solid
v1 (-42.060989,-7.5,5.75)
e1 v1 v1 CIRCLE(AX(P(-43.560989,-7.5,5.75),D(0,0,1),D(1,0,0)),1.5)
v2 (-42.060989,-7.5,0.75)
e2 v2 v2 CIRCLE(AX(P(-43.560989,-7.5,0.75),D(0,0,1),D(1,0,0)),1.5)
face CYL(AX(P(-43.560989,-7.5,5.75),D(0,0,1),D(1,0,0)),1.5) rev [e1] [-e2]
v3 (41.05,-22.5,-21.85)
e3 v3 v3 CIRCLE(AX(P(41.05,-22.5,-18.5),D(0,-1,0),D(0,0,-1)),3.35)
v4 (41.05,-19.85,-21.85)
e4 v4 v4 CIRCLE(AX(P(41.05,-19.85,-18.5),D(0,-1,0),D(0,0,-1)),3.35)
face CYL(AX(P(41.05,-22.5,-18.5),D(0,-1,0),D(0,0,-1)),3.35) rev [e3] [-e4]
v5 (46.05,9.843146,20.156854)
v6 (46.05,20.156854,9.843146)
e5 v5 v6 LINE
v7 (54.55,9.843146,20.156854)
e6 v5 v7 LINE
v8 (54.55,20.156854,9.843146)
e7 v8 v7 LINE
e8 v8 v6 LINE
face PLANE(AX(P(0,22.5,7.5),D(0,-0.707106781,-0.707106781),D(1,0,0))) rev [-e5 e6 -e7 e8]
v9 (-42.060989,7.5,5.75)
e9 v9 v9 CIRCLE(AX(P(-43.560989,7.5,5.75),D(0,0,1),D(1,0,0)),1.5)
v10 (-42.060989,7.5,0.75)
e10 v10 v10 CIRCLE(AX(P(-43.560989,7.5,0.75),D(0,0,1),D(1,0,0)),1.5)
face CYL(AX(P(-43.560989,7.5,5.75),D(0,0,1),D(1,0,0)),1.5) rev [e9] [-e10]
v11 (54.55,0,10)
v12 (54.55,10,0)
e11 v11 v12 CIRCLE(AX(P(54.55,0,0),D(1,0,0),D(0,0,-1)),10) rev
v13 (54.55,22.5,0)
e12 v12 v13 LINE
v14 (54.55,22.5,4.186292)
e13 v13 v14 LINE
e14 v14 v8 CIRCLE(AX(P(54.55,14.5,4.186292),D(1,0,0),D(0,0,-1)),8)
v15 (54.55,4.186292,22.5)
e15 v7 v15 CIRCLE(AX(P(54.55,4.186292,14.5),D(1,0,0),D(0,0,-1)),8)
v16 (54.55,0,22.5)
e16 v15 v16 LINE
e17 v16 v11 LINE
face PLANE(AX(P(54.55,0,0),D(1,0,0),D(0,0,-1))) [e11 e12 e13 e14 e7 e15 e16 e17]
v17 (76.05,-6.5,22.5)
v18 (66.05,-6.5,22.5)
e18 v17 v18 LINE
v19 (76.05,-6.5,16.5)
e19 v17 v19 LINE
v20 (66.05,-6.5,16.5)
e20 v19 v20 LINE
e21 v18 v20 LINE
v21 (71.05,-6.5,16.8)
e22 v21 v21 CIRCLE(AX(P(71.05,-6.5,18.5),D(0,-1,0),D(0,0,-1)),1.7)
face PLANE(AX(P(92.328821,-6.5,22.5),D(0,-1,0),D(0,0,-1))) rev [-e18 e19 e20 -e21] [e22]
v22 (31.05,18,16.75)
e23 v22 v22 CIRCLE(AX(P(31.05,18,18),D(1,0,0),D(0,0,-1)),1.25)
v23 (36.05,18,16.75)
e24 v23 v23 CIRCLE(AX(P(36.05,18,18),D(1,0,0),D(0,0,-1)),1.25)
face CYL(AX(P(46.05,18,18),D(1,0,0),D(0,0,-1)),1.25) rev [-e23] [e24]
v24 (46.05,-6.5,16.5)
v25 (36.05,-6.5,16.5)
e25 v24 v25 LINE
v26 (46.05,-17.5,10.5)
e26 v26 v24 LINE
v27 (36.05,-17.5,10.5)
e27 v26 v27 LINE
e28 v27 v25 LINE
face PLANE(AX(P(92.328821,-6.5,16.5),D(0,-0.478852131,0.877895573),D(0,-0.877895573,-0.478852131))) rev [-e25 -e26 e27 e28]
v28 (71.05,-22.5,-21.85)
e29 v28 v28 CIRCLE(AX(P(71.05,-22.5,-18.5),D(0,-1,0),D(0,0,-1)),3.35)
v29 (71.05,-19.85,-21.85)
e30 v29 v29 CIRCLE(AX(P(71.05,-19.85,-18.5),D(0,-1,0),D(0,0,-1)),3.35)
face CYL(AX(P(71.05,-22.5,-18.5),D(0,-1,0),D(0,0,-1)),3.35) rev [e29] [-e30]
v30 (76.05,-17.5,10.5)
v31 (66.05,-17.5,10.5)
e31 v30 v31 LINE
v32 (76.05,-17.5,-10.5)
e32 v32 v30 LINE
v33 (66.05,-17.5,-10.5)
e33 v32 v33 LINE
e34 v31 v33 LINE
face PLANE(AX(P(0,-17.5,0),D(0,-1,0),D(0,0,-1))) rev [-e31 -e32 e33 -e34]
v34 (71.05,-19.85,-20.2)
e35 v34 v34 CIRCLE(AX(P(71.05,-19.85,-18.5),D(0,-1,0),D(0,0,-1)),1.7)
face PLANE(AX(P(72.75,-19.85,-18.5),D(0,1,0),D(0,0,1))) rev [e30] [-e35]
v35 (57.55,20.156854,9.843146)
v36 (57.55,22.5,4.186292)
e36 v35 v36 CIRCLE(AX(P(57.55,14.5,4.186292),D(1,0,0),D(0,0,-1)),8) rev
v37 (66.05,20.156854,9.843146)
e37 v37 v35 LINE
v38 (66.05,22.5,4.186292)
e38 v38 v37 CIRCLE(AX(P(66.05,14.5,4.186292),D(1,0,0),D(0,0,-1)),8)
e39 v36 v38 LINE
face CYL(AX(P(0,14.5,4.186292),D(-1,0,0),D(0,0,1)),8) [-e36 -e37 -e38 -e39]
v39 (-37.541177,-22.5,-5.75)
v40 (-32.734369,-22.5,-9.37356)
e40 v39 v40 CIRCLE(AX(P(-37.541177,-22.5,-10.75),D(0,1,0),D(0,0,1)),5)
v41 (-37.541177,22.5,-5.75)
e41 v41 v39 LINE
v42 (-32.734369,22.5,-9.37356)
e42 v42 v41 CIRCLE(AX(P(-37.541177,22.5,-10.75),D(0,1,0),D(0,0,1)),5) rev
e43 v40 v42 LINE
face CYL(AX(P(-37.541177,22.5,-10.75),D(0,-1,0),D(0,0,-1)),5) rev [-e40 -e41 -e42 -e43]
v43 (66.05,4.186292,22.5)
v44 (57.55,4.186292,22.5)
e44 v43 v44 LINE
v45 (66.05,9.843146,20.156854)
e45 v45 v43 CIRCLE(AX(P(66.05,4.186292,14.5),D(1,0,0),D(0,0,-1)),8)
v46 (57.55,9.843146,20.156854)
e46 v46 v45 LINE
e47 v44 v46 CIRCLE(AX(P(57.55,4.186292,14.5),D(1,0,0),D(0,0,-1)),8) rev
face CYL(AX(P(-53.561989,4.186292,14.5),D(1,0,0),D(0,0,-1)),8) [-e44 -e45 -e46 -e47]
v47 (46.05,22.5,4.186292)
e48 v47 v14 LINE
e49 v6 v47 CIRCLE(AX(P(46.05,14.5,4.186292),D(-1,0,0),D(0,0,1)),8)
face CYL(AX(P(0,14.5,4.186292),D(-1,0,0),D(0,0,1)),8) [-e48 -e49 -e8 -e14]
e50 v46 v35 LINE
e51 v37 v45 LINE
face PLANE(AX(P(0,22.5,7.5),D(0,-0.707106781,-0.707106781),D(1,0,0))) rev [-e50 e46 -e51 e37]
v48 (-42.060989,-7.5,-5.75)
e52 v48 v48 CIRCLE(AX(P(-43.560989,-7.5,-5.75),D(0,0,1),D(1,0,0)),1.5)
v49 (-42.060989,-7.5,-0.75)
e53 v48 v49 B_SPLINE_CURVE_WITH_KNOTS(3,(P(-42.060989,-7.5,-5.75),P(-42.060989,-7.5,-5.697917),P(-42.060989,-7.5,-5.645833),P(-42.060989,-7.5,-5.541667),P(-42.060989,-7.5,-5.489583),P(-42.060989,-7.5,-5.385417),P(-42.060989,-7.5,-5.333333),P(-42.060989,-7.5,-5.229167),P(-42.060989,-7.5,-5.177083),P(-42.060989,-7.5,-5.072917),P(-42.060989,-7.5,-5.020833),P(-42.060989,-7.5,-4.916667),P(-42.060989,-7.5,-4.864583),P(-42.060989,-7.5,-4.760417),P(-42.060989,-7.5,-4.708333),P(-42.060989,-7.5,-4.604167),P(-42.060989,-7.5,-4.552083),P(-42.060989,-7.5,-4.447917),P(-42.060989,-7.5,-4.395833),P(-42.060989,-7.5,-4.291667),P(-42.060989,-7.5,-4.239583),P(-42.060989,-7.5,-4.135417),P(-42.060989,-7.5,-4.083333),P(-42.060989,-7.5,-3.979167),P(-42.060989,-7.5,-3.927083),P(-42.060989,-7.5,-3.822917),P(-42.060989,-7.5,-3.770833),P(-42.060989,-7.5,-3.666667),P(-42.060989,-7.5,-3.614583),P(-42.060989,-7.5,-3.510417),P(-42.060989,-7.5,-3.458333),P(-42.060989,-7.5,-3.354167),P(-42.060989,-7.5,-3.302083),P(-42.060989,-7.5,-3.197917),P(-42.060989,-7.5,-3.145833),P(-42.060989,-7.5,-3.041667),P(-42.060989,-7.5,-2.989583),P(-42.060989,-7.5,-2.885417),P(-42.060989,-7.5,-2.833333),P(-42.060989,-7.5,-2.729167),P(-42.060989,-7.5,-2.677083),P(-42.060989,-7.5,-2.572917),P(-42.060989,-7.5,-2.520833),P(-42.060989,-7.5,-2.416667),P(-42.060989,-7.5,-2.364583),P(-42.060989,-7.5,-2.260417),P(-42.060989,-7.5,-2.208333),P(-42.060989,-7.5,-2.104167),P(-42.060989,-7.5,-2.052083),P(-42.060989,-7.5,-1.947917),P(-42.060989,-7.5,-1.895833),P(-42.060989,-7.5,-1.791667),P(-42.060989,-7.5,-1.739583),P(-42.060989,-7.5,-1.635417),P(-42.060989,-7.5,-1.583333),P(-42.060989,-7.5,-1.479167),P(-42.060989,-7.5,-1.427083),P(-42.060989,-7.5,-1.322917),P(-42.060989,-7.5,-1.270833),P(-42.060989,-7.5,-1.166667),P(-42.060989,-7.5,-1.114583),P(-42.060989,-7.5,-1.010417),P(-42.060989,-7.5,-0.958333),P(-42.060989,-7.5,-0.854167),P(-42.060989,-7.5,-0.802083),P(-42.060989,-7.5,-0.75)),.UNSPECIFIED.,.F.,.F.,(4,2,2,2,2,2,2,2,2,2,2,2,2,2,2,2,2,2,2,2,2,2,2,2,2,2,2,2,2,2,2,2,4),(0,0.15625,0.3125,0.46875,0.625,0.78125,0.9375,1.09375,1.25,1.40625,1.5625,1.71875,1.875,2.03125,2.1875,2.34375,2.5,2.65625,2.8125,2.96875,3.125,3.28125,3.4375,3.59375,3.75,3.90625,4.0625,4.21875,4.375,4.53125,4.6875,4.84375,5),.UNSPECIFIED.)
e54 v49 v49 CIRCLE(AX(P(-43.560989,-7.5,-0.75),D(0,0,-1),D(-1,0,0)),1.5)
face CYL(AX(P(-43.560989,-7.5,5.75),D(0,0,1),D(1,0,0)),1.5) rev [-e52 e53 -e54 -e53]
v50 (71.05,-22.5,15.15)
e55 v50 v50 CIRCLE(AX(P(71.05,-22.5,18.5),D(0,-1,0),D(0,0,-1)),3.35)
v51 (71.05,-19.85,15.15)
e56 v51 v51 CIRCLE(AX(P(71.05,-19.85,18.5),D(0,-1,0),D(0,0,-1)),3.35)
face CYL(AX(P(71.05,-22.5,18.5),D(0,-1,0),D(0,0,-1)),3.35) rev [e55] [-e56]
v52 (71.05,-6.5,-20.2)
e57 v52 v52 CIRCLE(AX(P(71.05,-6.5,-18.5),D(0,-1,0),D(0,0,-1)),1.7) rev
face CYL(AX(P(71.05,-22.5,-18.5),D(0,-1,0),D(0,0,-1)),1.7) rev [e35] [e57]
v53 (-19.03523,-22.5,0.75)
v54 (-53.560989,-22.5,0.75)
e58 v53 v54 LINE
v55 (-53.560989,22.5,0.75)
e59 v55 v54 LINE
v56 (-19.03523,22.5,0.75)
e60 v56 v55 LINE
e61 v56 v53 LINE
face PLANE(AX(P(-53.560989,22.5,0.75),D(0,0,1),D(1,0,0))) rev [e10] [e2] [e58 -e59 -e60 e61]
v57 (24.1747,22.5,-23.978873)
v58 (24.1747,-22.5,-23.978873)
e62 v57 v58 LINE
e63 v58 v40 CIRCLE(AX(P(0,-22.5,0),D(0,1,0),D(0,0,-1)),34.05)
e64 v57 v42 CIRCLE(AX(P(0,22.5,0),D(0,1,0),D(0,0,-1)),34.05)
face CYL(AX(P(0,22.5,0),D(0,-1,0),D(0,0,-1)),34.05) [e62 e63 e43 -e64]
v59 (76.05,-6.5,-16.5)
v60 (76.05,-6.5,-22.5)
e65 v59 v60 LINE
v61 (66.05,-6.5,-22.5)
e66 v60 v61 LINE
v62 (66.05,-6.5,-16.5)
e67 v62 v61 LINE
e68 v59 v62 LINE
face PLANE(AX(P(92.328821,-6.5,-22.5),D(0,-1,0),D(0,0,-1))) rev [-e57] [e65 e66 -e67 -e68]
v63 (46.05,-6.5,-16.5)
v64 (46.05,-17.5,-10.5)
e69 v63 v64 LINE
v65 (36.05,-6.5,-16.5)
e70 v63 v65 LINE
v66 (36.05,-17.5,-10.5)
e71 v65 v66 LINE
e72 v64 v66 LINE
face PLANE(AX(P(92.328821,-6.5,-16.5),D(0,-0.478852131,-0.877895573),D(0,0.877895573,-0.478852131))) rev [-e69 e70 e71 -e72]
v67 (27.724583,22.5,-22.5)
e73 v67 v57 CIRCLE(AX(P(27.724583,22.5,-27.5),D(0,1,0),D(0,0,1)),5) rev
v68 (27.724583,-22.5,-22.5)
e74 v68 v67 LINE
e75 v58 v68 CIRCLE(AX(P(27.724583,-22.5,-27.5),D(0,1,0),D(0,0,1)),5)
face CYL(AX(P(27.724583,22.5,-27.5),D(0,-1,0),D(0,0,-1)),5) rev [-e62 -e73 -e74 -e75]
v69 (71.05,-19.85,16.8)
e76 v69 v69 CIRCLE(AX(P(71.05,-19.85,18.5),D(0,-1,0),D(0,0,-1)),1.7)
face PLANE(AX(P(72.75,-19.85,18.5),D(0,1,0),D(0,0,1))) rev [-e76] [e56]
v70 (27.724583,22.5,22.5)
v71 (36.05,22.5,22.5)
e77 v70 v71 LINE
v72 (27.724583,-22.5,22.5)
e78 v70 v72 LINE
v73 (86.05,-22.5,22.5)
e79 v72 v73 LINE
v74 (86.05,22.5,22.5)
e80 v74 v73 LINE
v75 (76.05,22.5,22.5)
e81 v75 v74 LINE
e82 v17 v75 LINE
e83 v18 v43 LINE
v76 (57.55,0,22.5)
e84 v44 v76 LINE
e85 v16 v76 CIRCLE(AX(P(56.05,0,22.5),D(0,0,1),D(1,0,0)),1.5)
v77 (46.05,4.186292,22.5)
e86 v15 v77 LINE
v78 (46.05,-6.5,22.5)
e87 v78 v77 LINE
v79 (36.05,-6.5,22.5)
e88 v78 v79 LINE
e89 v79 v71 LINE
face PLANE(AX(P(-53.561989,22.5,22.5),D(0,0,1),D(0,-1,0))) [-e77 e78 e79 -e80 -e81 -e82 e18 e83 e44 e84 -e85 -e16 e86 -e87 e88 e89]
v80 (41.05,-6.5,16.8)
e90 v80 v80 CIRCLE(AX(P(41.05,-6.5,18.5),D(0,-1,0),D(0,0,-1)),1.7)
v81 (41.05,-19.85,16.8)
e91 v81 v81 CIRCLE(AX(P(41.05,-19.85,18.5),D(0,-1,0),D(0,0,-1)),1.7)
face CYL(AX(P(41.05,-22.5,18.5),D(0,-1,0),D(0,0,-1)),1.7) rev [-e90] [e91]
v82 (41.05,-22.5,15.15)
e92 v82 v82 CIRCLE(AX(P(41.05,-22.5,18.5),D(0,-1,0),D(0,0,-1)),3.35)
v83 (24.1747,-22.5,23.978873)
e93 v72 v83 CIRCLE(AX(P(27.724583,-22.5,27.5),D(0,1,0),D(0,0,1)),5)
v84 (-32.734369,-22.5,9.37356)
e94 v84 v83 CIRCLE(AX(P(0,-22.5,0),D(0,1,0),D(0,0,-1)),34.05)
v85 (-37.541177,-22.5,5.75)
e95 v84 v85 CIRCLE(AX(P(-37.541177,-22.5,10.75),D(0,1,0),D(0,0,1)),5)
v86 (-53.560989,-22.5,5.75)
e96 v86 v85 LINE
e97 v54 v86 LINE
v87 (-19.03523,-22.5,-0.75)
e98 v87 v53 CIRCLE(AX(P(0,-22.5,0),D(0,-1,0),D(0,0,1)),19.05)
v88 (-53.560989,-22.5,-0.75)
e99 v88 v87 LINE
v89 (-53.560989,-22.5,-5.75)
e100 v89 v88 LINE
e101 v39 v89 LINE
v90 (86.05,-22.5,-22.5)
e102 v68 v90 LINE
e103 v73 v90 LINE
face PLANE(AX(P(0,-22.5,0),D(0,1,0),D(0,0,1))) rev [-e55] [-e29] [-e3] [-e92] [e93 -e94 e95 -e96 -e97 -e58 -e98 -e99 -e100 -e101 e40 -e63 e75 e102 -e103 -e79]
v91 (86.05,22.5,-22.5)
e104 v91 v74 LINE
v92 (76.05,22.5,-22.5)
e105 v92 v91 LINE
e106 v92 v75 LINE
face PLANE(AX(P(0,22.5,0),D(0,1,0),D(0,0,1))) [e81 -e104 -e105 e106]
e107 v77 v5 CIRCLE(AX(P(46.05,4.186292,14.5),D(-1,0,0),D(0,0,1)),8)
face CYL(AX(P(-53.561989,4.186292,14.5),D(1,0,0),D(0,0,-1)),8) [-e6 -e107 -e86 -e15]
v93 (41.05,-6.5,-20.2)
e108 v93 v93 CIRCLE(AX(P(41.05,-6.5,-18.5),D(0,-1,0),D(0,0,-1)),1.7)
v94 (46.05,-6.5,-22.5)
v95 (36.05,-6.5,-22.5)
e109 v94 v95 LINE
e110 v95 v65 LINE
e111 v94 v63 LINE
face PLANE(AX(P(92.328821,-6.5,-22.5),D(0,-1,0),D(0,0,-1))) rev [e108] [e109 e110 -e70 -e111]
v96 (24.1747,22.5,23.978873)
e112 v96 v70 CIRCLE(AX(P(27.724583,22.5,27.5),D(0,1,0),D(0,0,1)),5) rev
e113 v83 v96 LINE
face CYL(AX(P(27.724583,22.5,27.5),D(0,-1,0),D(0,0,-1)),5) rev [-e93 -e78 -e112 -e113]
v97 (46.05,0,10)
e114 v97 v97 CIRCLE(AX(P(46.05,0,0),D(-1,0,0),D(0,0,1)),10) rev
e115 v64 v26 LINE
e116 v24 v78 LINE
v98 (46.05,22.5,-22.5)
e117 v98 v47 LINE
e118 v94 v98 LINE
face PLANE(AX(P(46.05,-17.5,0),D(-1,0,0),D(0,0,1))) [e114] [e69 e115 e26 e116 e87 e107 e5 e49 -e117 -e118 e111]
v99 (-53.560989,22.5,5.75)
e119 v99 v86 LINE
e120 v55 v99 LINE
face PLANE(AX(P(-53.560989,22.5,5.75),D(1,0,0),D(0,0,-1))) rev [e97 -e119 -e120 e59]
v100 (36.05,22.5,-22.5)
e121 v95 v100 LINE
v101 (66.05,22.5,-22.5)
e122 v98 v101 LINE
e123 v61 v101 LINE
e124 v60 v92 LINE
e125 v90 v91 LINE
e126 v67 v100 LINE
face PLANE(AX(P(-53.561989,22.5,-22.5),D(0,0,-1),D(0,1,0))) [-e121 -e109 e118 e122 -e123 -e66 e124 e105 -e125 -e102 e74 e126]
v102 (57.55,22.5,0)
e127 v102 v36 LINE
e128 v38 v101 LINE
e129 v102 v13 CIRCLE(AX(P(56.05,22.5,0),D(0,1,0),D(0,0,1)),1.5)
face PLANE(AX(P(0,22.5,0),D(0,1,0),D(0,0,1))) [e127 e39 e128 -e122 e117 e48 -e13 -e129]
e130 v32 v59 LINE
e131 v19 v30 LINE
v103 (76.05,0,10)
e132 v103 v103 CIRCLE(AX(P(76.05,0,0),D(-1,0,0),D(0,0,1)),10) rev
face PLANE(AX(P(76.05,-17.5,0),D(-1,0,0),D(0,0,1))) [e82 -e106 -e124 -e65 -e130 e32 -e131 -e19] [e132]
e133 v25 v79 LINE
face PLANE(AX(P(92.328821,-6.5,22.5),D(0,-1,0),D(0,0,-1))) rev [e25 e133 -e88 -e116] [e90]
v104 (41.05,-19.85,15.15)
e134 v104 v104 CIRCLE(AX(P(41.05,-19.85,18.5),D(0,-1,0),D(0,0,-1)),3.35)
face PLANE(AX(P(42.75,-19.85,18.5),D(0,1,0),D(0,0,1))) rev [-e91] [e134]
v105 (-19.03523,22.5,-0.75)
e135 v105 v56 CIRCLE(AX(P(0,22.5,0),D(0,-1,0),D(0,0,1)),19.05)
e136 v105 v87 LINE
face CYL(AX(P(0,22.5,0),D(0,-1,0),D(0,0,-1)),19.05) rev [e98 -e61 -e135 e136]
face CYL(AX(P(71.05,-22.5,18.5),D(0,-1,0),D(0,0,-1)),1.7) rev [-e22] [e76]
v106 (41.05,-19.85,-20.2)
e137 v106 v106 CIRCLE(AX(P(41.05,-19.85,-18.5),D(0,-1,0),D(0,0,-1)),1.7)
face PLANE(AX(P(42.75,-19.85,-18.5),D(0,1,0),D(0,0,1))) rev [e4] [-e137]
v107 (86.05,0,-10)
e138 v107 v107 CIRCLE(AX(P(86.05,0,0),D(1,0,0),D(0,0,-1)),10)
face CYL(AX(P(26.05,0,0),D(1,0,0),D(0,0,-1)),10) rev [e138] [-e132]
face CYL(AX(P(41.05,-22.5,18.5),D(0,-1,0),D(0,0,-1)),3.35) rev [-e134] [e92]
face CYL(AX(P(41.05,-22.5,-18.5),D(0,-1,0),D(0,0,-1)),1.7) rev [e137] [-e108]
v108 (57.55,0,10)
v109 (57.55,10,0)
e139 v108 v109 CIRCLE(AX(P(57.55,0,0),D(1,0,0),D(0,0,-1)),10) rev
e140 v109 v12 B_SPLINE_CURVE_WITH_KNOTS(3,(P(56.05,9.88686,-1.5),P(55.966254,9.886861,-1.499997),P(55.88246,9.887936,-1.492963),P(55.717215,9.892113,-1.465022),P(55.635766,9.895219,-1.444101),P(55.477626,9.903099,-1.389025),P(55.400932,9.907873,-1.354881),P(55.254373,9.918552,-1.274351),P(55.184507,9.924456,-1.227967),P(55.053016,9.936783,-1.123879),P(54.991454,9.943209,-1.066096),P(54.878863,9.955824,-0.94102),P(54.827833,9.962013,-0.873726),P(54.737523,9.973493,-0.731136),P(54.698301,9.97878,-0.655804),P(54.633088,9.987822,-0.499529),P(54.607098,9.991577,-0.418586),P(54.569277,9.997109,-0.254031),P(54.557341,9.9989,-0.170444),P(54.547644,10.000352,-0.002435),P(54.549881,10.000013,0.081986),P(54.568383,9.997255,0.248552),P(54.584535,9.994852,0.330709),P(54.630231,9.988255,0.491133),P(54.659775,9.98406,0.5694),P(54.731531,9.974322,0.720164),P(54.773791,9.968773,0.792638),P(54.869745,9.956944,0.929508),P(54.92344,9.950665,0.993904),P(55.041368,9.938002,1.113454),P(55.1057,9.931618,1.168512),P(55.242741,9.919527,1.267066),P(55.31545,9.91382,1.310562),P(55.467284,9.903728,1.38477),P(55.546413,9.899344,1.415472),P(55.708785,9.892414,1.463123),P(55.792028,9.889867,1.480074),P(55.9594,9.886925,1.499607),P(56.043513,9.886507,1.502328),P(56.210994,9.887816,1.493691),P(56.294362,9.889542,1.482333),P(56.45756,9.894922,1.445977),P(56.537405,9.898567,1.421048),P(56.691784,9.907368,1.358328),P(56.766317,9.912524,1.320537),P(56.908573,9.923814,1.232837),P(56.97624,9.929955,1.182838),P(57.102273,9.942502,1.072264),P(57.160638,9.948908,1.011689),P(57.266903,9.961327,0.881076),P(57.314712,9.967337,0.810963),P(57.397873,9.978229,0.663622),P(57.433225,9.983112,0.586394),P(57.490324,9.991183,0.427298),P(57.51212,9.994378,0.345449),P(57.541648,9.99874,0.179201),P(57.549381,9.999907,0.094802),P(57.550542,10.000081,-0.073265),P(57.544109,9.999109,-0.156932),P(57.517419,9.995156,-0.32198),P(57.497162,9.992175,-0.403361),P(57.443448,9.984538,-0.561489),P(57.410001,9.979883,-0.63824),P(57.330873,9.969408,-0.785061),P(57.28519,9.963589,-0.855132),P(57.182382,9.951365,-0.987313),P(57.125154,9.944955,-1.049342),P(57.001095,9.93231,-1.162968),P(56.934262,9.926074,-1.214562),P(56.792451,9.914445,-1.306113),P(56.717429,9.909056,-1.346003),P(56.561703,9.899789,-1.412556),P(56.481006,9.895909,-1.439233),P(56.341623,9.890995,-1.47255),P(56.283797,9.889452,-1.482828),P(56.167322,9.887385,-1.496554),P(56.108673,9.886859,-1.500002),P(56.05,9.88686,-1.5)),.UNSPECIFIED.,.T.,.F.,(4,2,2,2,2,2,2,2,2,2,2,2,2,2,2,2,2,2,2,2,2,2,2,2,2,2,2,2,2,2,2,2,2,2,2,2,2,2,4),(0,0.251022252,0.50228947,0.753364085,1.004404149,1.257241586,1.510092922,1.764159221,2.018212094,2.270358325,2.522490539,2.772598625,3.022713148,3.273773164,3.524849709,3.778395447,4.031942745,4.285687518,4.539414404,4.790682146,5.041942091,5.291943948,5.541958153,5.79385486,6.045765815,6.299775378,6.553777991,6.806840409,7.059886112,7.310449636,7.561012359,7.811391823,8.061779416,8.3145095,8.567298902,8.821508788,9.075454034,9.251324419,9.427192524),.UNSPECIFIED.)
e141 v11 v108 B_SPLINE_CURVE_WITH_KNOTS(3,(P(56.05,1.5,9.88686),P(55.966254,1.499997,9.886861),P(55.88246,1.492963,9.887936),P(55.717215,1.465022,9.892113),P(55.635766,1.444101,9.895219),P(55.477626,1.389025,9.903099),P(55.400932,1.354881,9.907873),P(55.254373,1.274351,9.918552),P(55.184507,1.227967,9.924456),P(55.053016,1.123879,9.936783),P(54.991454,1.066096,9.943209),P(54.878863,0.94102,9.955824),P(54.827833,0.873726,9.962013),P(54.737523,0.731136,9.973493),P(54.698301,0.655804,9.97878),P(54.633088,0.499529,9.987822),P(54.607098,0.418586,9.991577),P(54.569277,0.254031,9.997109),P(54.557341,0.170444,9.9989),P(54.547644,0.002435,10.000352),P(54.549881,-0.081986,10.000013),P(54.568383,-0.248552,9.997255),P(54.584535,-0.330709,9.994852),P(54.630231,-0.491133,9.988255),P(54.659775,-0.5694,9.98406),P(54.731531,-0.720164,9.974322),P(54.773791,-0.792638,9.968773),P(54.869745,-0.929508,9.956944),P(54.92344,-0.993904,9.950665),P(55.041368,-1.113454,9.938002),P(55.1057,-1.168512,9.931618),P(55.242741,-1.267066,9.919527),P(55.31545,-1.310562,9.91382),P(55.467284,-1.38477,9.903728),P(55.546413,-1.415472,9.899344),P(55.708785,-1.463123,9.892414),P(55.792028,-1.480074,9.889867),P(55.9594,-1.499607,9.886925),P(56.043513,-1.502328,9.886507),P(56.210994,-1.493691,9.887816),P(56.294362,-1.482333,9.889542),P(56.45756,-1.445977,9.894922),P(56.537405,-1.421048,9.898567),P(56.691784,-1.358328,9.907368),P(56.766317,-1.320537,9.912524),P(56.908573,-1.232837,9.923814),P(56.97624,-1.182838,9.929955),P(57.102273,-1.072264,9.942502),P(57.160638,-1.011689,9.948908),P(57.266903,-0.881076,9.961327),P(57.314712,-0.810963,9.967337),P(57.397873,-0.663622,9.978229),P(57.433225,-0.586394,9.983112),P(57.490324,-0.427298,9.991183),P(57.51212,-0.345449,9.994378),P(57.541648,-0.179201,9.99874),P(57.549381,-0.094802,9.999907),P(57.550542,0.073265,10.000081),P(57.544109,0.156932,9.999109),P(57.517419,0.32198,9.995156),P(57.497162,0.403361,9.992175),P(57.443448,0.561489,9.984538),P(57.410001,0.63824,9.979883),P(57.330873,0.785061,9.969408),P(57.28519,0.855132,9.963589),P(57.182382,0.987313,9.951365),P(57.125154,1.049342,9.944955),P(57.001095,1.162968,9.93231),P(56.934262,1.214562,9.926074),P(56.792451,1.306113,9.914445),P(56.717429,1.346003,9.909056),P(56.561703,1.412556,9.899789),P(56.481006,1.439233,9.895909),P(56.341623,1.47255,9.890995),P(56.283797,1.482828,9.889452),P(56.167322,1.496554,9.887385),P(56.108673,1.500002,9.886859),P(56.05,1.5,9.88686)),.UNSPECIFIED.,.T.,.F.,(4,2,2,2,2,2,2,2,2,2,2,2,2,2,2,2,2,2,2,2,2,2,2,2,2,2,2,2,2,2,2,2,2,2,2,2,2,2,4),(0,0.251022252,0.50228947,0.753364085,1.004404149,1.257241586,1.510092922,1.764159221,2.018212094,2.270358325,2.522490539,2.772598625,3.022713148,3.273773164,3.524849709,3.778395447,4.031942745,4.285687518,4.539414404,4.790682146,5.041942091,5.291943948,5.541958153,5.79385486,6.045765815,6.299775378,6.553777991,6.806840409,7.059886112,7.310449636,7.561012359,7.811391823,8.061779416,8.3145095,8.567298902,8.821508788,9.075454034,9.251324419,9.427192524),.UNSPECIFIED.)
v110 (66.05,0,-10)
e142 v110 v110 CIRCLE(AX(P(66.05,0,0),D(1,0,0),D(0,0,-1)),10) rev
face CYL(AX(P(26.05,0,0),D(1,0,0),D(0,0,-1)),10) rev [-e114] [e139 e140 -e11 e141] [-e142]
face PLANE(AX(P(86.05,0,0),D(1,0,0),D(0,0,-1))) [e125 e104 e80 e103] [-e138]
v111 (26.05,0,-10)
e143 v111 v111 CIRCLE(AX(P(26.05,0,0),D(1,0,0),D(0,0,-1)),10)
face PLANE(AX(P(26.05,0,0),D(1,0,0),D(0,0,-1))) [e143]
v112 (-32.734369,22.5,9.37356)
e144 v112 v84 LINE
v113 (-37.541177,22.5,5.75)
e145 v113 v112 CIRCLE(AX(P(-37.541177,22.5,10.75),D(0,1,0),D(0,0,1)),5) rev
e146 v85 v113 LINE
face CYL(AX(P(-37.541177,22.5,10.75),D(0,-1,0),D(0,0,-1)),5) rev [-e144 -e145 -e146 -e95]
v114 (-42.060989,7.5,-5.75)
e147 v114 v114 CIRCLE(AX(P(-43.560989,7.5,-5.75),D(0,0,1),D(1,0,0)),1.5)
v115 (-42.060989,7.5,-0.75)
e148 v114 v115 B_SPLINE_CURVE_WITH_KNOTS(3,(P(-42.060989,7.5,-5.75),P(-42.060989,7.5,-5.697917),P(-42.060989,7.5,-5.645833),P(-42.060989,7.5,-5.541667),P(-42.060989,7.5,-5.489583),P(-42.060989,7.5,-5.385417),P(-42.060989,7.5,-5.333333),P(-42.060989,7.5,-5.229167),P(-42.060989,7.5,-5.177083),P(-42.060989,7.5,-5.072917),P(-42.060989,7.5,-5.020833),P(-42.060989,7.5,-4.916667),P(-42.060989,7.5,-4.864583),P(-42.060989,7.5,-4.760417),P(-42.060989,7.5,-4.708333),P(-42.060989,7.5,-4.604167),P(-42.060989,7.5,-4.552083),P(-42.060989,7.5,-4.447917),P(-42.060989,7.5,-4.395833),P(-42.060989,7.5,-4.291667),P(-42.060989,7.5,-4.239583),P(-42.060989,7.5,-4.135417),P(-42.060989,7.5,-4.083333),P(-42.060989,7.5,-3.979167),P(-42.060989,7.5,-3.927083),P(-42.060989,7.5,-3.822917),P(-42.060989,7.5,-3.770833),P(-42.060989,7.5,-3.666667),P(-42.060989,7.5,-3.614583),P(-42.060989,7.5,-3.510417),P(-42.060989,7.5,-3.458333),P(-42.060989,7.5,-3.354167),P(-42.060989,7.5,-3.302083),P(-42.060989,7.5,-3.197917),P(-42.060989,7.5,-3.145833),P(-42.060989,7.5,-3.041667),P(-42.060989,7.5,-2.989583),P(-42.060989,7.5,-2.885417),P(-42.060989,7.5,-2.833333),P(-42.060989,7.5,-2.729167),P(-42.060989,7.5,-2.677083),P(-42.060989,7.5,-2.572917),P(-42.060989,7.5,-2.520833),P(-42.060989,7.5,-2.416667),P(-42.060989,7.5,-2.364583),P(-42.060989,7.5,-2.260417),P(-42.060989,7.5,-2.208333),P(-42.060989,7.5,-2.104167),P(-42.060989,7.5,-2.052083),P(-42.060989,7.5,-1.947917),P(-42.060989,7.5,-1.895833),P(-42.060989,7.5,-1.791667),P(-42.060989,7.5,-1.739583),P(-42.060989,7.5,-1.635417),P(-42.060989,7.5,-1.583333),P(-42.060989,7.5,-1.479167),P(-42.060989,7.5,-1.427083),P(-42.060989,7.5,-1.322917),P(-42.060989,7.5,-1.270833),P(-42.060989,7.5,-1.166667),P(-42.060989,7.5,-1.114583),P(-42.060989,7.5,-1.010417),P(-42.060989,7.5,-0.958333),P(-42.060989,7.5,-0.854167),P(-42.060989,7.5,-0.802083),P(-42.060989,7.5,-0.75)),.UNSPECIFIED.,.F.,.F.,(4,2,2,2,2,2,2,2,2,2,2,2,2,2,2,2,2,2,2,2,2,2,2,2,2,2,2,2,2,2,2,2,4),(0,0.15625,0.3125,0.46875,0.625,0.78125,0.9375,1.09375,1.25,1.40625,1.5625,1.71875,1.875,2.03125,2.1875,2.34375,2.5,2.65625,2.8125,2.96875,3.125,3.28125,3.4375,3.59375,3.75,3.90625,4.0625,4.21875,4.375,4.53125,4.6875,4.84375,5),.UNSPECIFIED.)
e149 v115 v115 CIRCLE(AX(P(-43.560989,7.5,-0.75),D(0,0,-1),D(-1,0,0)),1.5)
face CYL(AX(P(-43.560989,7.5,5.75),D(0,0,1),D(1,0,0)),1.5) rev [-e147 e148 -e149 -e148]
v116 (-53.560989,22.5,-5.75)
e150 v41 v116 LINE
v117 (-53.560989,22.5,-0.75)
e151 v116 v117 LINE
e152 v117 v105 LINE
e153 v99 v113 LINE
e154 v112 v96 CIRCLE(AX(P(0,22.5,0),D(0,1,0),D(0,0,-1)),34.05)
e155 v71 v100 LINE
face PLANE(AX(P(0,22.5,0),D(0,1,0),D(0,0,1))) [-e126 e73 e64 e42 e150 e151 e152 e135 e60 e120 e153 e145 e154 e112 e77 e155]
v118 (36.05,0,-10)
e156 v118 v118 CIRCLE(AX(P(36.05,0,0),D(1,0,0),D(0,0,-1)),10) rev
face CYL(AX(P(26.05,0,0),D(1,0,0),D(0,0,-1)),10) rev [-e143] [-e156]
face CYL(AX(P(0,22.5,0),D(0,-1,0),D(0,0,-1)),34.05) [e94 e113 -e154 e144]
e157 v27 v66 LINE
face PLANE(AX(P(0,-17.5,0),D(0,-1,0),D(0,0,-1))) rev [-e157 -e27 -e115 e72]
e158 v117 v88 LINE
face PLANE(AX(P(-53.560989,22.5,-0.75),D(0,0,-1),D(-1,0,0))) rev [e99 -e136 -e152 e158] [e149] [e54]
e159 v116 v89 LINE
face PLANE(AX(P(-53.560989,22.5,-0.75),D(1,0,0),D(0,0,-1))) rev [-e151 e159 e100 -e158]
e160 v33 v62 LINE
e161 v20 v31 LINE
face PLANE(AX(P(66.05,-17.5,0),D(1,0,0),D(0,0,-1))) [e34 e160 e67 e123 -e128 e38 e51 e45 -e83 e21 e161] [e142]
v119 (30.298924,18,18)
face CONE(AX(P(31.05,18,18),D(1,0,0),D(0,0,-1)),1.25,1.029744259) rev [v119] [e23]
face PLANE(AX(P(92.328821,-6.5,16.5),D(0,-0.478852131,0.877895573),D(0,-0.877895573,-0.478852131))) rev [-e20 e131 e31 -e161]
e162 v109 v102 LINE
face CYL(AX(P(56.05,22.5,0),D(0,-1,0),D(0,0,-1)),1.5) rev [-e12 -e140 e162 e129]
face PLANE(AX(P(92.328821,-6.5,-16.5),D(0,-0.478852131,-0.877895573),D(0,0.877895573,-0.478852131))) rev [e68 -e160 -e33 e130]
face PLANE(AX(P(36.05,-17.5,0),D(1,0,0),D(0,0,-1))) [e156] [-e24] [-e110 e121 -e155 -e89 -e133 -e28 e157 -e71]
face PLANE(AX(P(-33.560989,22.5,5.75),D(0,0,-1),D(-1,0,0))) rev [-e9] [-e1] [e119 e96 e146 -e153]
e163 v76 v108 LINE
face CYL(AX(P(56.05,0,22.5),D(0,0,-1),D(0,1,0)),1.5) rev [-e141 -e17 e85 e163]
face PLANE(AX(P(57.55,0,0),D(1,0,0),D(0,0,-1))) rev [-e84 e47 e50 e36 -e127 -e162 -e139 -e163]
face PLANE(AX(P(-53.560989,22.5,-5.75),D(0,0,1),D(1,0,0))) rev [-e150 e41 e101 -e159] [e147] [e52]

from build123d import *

# Parameters (mm, degrees)
BOSS_EXTRUDE1_DEPTH             = 22.5
F_3_0MM_DOWEL_HOLE1_D           = 3
BOSS_EXTRUDE2_START             = -8.493151603
BOSS_EXTRUDE2_OUTLINE_W         = 45
BOSS_EXTRUDE2_OUTLINE_H         = 45
BOSS_EXTRUDE2_DEPTH             = 60.493151603
SKETCH5_R                       = 10
CUT_EXTRUDE1_DEPTH              = 60
CUT_EXTRUDE2_START              = 22.5
SKETCH7_W                       = 10
SKETCH7_H                       = 45
CUT_EXTRUDE2_DEPTH              = 40
SKETCH8_W                       = 22.5
SKETCH8_H                       = 22.5
CUT_EXTRUDE3_DEPTH              = 1.5
CUT_EXTRUDE5_OUTLINE_W          = 1.5
CUT_EXTRUDE5_OUTLINE_H          = 12.613186919
CUT_EXTRUDE8_START              = 9.886859865
CUT_EXTRUDE8_DEPTH              = 12.613140135
CHAMFER1_SIZE                   = 15
FILLET3_R                       = 5
FILLET2_R                       = 8
BOSS_EXTRUDE3_DEPTH             = 40
M3X0_5_TAPPED_HOLE1_D           = 2.5
M3X0_5_TAPPED_HOLE1_DEPTH       = 25
M3X0_5_TAPPED_HOLE1_TIP         = 0.751075774
CBORE_FOR_M3_SBHCS1_D           = 3.4
CBORE_FOR_M3_SBHCS1_DEPTH       = 16
CBORE_FOR_M3_SBHCS1_CBORE_D     = 6.7
CBORE_FOR_M3_SBHCS1_CBORE_DEPTH = 2.65
CBORE_FOR_M3_SBHCS1_TIP         = 1.021463052


# Read off the part's stored shape, not the designer's step: Boss-Extrude2, Cut-Extrude5, Cut-Extrude8
with BuildPart() as part:
    # Sketch3 → Boss-Extrude1 (new, symmetric)
    with BuildSketch(Plane(origin=(0, 0, 0), x_dir=(1, 0, 0), z_dir=(0, 1, 0))):
        with BuildLine():
            Line((-53.560989258, 0.75), (-53.560989258, 5.75))
            Line((-53.560989258, 5.75), (-33.560989258, 5.75))
            ThreePointArc((-33.560989258, 5.75), (34.05, 0), (-33.560989258, -5.75))
            Line((-33.560989258, -5.75), (-53.560989258, -5.75))
            Line((-53.560989258, -5.75), (-53.560989258, -0.75))
            Line((-53.560989258, -0.75), (-19.035230495, -0.75))
            ThreePointArc((-19.035230495, -0.75), (19.05, 0), (-19.035230495, 0.75))
            Line((-19.035230495, 0.75), (-53.560989258, 0.75))
        make_face()
    extrude(amount=BOSS_EXTRUDE1_DEPTH, both=True)

    # Ø3.0mm Dowel Hole1 (through all)
    with Locations(Plane.XY.offset(5.75)):
        with Locations((-43.560989258, 7.5), (-43.560989258, -7.5)):
            Hole(F_3_0MM_DOWEL_HOLE1_D / 2)

    # Boss-Extrude2 outline → Boss-Extrude2 (add)
    with BuildSketch(Plane(origin=(34.05, 0, 0), x_dir=(0, 0, -1), z_dir=(1, 0, 0)).offset(BOSS_EXTRUDE2_START)):
        Rectangle(BOSS_EXTRUDE2_OUTLINE_W, BOSS_EXTRUDE2_OUTLINE_H)
    extrude(amount=BOSS_EXTRUDE2_DEPTH)

    # Sketch5 → Cut-Extrude1 (cut)
    with BuildSketch(Plane(origin=(86.05, 0, 0), x_dir=(0, 0, -1), z_dir=(1, 0, 0))):
        Circle(SKETCH5_R)
    extrude(amount=-CUT_EXTRUDE1_DEPTH, mode=Mode.SUBTRACT)

    # Sketch7 → Cut-Extrude2 (cut)
    with BuildSketch(Plane(origin=(0, 0, 0), x_dir=(1, 0, 0), z_dir=(0, 1, 0)).offset(CUT_EXTRUDE2_START)):
        with Locations((71.05, 0)):
            Rectangle(SKETCH7_W, SKETCH7_H)
        with Locations((41.05, 0)):
            Rectangle(SKETCH7_W, SKETCH7_H)
    extrude(amount=-CUT_EXTRUDE2_DEPTH, mode=Mode.SUBTRACT)

    # Sketch8 → Cut-Extrude3 (cut, symmetric)
    with BuildSketch(Plane(origin=(56.05, 0, 0), x_dir=(0, 0, -1), z_dir=(1, 0, 0))):
        with Locations((-11.25, 11.25)):
            Rectangle(SKETCH8_W, SKETCH8_H)
    extrude(amount=CUT_EXTRUDE3_DEPTH, both=True, mode=Mode.SUBTRACT)

    # Cut-Extrude5 outline → Cut-Extrude5 (revolve, cut)
    with BuildSketch(Plane(origin=(56.05, 0, 0), x_dir=(1, 0, 0), z_dir=(0, -1, 0))):
        with Locations((0.75, 16.19340654)):
            Rectangle(CUT_EXTRUDE5_OUTLINE_W, CUT_EXTRUDE5_OUTLINE_H)
    revolve(axis=Axis((56.05, 0, 0), (0, 0, 1)), mode=Mode.SUBTRACT)

    # Cut-Extrude8 outline → Cut-Extrude8 (cut)
    with BuildSketch(Plane(origin=(0, 0, 0), x_dir=(1, 0, 0), z_dir=(0, 1, 0)).offset(CUT_EXTRUDE8_START)):
        with BuildLine():
            ThreePointArc((57.55, 0), (56.05, 1.5), (54.55, 0))
            Line((54.55, 0), (57.55, 0))
        make_face()
    extrude(amount=CUT_EXTRUDE8_DEPTH, mode=Mode.SUBTRACT)

    # Chamfer1
    chamfer1_edges = [part.edges().sort_by_distance(p)[0] for p in [
        (61.8, 22.5, 22.5),
        (50.3, 22.5, 22.5),
    ]]
    chamfer(chamfer1_edges, length=CHAMFER1_SIZE)

    # Fillet3
    fillet3_edges = [part.edges().sort_by_distance(p)[0] for p in [
        (-33.560989258, 0, -5.75),
        (-33.560989258, 0, 5.75),
        (25.556848397, 0, -22.5),
        (25.556848397, 0, 22.5),
    ]]
    fillet(fillet3_edges, radius=FILLET3_R)

    # Fillet2
    fillet2_edges = [part.edges().sort_by_distance(p)[0] for p in [
        (50.3, 22.5, 7.5),
        (61.8, 22.5, 7.5),
        (50.3, 7.5, 22.5),
        (61.8, 7.5, 22.5),
    ]]
    fillet(fillet2_edges, radius=FILLET2_R)

    # Sketch15 → Boss-Extrude3 (add)
    with BuildSketch(Plane(origin=(36.05, 0, 0), x_dir=(0, 0, -1), z_dir=(1, 0, 0))):
        Polygon((-22.5, -6.5), (-16.5, -6.5), (-10.5, -17.5), (-22.5, -17.5), align=None)
        Polygon((22.5, -6.5), (16.5, -6.5), (10.5, -17.5), (22.5, -17.5), align=None)
    extrude(amount=BOSS_EXTRUDE3_DEPTH)

    # M3x0.5 Tapped Hole1
    with Locations(Plane(origin=(0, -22.5, 0), x_dir=(-1, 0, 0), z_dir=(0, -1, 0))):
        with Locations((-41.05, -18.5), (-71.05, 18.5), (-71.05, -18.5), (-41.05, 18.5)):
            Hole(M3X0_5_TAPPED_HOLE1_D / 2, depth=M3X0_5_TAPPED_HOLE1_DEPTH)
            with Locations((0, 0, -(M3X0_5_TAPPED_HOLE1_DEPTH + M3X0_5_TAPPED_HOLE1_TIP / 2))):  # 118° drill point
                Cone(0, M3X0_5_TAPPED_HOLE1_D / 2, M3X0_5_TAPPED_HOLE1_TIP, mode=Mode.SUBTRACT)

    # Sketch16 → M3x0.5 Tapped Hole2 (revolve, cut)
    with BuildSketch(Plane(origin=(46.05, 18, 18), x_dir=(0, 0, -1), z_dir=(0, 1, 0))):
        Polygon((0, 0), (0, 15.751075774), (1.25, 15), (1.25, 0), align=None)
    revolve(axis=Axis((52.4, 18, 18), (-1, 0, 0)), mode=Mode.SUBTRACT)

    # CBORE for M3 SBHCS1
    with Locations(Plane(origin=(0, -22.5, 0), x_dir=(-1, 0, 0), z_dir=(0, -1, 0))):
        with Locations((-71.05, 18.5), (-41.05, 18.5), (-41.05, -18.5), (-71.05, -18.5)):
            CounterBoreHole(CBORE_FOR_M3_SBHCS1_D / 2, CBORE_FOR_M3_SBHCS1_CBORE_D / 2, CBORE_FOR_M3_SBHCS1_CBORE_DEPTH, depth=CBORE_FOR_M3_SBHCS1_DEPTH)
            with Locations((0, 0, -(CBORE_FOR_M3_SBHCS1_DEPTH + CBORE_FOR_M3_SBHCS1_TIP / 2))):  # 118° drill point
                Cone(0, CBORE_FOR_M3_SBHCS1_D / 2, CBORE_FOR_M3_SBHCS1_TIP, mode=Mode.SUBTRACT)


solid = part.part
